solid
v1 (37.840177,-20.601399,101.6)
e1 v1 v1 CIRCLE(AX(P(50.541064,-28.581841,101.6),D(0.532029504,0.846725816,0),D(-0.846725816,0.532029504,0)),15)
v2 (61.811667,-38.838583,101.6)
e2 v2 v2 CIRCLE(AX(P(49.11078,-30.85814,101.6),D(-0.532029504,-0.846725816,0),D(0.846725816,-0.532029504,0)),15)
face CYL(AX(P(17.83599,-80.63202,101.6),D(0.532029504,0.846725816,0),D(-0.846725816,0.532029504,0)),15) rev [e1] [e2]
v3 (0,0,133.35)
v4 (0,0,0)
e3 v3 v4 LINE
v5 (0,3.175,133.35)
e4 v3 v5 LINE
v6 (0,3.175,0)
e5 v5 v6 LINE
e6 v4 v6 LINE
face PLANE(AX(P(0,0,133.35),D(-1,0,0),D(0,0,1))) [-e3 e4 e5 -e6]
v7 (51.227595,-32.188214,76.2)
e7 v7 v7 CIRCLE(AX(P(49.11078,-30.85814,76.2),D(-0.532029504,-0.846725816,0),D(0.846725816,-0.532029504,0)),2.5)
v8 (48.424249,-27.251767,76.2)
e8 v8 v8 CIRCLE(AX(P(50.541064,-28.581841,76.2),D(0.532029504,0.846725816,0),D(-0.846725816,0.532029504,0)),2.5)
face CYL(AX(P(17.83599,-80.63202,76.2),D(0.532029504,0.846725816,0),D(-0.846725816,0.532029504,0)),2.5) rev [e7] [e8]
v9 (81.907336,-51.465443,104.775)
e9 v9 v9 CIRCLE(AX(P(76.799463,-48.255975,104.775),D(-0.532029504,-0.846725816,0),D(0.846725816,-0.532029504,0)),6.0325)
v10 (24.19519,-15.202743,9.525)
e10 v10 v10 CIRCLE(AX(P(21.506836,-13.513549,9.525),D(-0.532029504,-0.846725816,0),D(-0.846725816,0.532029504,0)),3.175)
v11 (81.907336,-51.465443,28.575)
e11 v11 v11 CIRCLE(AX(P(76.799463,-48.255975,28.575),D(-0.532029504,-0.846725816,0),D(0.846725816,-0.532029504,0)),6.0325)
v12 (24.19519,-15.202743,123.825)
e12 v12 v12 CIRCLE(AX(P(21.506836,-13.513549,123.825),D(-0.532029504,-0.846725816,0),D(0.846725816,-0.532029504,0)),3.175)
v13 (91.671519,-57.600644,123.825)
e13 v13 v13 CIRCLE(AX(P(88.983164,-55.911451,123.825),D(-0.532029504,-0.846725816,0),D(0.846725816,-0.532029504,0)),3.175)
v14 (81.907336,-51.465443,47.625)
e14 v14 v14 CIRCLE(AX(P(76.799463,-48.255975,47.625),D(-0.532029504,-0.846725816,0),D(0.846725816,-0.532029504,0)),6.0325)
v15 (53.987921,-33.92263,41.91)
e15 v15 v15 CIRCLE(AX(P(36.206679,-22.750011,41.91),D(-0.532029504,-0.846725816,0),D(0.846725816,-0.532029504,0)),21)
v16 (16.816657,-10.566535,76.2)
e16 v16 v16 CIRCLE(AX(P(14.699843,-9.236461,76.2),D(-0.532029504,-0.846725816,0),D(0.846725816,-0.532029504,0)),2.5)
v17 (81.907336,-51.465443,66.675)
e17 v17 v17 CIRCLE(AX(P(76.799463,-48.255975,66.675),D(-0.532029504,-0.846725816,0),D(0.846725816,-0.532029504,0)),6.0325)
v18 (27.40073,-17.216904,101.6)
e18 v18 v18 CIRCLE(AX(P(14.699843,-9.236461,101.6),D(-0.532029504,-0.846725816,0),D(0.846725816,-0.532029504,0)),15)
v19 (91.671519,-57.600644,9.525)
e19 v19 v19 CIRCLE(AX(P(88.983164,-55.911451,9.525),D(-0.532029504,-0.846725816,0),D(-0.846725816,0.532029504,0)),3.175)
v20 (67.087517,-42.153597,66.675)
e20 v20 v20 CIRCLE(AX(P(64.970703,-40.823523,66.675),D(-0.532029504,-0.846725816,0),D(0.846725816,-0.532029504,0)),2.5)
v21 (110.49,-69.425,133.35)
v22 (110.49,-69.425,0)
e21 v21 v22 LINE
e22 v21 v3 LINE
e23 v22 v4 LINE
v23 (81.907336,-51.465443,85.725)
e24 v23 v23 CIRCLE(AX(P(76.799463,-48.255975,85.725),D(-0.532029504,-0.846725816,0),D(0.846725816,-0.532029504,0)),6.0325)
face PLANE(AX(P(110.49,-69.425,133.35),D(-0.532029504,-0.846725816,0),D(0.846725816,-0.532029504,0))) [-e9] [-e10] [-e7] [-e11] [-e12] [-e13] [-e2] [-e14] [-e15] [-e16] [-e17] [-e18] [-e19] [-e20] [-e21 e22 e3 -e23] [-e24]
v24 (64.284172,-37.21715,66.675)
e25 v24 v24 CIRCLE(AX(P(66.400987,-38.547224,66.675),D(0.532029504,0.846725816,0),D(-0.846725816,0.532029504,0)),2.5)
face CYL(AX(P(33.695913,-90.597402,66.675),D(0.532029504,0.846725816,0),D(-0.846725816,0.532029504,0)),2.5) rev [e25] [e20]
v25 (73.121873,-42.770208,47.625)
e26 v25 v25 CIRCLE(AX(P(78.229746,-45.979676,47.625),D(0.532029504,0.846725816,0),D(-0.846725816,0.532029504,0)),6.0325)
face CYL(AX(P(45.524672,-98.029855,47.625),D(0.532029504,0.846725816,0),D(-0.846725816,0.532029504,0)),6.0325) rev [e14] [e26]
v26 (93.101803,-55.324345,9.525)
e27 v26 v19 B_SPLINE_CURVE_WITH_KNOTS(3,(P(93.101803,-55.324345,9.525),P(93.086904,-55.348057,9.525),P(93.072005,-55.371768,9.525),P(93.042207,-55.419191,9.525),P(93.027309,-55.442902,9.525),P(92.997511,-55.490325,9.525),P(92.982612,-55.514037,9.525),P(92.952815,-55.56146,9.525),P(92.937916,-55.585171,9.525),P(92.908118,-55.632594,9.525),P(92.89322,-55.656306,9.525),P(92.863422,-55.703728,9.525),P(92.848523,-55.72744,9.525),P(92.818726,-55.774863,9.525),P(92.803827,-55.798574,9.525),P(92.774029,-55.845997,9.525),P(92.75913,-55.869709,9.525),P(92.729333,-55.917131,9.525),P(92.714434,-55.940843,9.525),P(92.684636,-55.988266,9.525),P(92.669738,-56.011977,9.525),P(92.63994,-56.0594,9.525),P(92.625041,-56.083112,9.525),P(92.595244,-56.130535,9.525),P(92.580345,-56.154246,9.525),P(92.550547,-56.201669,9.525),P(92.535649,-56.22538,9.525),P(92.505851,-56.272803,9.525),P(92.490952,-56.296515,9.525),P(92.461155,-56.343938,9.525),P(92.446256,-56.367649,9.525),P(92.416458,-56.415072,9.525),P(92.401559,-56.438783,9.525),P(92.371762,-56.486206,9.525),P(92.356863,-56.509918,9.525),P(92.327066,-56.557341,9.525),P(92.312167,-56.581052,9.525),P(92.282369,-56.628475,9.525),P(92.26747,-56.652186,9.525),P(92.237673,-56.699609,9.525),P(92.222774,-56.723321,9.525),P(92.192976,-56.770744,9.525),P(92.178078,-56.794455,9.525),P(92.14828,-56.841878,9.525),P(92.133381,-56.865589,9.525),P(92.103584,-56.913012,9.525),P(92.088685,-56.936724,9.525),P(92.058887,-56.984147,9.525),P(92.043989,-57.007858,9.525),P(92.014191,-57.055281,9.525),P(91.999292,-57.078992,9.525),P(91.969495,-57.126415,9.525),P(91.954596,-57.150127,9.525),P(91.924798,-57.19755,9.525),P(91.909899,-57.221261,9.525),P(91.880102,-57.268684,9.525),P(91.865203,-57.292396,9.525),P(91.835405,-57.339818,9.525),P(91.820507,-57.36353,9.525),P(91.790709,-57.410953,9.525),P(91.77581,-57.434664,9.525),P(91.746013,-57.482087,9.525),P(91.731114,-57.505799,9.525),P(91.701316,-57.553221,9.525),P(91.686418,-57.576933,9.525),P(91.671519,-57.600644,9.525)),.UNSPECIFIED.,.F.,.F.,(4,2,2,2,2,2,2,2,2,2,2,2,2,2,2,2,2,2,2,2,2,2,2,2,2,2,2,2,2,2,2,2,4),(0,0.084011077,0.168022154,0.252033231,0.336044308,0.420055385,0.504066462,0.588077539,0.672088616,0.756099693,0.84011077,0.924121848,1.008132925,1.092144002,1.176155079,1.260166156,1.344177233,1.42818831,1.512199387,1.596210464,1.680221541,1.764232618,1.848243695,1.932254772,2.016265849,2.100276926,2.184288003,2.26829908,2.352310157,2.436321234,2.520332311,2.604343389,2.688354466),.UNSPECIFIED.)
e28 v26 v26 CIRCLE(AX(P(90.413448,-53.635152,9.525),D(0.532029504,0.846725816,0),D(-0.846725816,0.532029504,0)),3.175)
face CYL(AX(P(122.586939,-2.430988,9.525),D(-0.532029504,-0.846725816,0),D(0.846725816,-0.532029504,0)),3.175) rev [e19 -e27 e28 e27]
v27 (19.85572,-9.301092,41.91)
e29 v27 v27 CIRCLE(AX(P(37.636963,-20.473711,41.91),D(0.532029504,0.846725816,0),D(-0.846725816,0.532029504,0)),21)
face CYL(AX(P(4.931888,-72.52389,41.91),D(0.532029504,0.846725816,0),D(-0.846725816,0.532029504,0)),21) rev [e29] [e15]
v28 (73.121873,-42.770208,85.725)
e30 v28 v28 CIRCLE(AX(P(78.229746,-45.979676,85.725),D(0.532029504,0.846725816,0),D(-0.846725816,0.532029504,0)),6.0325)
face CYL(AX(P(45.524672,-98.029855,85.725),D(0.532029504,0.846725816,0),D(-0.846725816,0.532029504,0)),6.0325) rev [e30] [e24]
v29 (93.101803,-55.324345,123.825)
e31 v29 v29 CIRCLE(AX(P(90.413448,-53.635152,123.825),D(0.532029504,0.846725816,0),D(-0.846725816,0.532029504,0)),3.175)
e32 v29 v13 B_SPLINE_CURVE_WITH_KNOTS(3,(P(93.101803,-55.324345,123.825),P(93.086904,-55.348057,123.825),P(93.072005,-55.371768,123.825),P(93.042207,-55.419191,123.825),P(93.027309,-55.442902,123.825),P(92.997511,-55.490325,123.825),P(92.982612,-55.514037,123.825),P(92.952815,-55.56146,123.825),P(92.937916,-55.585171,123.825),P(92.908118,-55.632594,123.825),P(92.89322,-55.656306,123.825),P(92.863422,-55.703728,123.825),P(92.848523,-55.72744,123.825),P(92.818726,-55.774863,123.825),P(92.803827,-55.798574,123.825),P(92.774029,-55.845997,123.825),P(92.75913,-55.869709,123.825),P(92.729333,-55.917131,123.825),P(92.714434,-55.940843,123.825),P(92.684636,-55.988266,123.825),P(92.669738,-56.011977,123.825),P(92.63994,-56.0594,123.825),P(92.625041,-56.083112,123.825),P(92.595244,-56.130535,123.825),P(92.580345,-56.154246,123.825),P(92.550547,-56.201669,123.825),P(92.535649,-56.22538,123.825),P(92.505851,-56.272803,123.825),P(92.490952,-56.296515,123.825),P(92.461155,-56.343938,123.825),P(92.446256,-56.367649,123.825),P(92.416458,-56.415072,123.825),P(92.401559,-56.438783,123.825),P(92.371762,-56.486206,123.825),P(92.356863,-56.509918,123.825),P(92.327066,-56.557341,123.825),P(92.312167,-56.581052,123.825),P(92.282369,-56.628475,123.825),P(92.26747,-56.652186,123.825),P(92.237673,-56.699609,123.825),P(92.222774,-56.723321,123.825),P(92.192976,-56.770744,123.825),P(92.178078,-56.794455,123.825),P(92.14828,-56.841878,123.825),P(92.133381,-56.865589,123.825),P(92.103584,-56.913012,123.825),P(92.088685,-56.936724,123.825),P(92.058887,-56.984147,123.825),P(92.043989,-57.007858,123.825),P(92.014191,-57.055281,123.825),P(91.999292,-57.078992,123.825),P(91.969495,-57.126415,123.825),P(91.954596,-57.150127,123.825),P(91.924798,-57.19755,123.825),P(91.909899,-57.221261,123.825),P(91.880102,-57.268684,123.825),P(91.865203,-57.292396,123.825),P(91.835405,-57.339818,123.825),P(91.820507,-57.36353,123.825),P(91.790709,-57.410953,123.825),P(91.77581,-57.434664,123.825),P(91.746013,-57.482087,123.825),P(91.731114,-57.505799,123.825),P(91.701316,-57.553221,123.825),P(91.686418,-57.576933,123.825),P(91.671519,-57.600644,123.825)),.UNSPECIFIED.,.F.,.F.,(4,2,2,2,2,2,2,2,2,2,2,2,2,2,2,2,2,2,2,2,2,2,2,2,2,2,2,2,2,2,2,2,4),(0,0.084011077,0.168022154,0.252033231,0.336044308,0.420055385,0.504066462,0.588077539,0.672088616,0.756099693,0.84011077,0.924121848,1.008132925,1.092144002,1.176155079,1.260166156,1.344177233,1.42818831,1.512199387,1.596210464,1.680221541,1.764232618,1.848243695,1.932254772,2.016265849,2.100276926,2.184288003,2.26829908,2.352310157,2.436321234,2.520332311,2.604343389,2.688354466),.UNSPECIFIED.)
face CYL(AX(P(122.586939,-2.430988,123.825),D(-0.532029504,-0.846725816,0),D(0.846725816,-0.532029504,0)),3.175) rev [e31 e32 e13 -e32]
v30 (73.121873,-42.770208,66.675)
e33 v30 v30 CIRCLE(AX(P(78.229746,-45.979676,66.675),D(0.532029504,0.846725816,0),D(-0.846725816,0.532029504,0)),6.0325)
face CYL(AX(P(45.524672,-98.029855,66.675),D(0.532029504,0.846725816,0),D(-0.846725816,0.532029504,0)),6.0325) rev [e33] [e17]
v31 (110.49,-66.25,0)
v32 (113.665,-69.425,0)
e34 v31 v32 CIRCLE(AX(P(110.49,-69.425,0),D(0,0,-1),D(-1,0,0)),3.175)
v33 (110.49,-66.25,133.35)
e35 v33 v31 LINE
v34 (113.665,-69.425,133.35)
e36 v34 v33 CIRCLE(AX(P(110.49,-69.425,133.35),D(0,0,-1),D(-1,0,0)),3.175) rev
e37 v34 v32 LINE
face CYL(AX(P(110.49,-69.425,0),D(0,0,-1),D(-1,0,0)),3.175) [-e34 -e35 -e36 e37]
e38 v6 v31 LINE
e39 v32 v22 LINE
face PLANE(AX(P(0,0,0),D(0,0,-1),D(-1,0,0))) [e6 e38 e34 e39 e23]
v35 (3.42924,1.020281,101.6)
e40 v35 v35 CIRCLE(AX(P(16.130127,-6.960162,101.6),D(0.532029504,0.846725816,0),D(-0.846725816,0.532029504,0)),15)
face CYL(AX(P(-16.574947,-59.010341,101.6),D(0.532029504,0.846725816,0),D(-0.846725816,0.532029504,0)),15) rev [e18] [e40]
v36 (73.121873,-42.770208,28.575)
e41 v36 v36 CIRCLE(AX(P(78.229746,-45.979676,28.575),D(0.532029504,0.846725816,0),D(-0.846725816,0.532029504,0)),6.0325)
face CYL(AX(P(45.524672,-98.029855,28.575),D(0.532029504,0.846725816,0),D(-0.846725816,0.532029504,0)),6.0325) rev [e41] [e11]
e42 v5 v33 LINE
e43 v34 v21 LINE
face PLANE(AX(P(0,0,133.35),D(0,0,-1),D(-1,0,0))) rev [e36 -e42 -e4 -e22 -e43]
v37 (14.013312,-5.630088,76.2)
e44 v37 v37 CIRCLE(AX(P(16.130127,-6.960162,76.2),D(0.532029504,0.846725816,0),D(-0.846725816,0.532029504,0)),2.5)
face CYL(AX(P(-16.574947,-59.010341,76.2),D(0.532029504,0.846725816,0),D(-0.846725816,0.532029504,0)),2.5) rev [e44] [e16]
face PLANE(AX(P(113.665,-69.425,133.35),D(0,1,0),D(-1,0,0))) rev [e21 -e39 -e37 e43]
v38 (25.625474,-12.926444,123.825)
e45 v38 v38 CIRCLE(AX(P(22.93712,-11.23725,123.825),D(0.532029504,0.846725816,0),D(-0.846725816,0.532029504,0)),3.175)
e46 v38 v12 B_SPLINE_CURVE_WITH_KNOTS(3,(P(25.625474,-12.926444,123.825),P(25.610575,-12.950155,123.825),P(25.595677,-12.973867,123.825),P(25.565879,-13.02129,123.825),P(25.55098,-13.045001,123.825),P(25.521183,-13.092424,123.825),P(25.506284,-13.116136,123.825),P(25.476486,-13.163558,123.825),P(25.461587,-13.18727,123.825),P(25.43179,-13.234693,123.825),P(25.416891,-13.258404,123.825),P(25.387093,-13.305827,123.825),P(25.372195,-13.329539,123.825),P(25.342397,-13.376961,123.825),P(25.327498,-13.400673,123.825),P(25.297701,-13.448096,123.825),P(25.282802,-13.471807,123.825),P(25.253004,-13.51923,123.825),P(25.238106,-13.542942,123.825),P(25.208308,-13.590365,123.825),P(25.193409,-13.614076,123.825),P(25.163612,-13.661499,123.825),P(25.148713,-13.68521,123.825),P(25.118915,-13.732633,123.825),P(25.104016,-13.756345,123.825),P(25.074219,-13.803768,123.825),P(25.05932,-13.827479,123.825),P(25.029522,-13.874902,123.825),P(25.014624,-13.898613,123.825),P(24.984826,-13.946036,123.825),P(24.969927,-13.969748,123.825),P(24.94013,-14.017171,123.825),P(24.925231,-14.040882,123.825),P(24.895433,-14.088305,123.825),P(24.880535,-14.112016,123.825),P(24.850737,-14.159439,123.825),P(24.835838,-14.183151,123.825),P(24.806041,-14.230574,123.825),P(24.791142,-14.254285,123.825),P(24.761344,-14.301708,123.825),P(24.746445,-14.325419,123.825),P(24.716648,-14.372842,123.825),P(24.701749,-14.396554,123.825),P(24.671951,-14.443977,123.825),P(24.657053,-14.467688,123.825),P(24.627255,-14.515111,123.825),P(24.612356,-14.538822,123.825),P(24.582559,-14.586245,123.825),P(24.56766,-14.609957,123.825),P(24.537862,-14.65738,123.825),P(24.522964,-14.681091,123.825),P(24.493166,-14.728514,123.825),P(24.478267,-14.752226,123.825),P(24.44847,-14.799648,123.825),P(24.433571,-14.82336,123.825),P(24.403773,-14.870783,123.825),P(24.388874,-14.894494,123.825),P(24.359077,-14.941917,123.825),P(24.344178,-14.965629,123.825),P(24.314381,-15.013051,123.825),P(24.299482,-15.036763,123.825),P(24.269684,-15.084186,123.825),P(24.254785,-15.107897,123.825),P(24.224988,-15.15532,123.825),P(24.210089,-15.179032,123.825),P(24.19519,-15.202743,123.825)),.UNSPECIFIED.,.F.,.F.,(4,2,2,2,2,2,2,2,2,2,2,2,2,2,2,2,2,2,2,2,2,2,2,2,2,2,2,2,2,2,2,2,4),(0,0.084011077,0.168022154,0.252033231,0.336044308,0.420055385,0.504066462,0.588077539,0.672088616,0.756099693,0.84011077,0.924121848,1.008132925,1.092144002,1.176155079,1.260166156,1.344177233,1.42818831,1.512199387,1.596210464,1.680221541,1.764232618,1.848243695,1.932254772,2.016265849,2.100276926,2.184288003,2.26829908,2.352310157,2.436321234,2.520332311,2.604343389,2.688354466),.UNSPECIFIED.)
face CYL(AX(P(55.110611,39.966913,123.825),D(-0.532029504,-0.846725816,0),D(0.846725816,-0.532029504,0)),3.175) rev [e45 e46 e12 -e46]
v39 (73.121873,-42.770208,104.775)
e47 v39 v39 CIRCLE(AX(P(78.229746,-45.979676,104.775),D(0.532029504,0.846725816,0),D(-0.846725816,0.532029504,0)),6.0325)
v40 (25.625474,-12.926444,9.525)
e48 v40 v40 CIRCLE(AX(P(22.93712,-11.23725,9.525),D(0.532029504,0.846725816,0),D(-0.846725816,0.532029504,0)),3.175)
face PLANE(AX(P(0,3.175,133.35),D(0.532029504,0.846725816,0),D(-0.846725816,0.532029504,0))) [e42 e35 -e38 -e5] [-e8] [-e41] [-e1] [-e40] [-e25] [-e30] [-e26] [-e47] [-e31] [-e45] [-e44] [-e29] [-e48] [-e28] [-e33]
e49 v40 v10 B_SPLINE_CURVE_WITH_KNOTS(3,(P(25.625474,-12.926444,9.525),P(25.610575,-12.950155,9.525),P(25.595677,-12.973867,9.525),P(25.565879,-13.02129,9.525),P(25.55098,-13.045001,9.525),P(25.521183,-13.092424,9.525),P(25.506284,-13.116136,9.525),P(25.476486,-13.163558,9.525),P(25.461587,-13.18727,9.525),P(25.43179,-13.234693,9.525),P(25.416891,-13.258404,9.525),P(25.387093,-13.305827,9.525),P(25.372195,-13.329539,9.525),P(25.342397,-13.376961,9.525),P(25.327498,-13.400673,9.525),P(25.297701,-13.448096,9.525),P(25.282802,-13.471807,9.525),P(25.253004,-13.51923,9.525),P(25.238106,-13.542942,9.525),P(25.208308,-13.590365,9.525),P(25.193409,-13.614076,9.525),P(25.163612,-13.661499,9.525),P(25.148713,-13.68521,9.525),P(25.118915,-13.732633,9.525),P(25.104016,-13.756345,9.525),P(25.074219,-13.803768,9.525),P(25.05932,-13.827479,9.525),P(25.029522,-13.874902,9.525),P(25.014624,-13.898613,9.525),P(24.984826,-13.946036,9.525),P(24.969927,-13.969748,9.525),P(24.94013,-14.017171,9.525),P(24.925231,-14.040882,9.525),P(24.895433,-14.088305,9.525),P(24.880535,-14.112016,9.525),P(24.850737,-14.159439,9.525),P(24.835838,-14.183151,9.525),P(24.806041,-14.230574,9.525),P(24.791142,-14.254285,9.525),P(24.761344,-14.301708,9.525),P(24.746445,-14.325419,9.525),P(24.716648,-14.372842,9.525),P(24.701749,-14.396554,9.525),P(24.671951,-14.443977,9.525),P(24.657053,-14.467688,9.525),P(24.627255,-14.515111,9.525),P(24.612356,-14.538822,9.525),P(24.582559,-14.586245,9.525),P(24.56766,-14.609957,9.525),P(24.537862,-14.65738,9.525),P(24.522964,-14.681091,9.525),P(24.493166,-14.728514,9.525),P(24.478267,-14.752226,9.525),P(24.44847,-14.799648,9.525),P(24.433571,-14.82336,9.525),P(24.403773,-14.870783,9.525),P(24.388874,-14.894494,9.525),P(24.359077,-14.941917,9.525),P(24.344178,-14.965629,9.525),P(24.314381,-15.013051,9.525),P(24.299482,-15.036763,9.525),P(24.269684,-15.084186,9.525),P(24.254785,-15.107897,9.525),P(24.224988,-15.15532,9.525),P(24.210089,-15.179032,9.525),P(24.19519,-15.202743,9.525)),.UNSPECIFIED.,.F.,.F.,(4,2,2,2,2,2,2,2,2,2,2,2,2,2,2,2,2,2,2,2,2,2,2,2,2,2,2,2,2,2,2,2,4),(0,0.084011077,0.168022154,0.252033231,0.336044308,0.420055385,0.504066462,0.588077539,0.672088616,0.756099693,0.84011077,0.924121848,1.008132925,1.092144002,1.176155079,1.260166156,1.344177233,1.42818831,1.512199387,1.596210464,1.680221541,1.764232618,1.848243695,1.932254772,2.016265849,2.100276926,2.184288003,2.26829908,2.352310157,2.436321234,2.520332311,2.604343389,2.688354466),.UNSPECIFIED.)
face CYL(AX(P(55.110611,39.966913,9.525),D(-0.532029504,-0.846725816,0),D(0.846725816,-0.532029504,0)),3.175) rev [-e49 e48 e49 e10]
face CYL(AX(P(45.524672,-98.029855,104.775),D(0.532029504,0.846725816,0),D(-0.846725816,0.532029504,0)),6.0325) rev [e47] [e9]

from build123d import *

# Parameters (mm, degrees)
BOSS_EXTRUDE1_DEPTH = 133.35
SKETCH2_R           = 21
CUT_EXTRUDE1_DEPTH  = 187.593999065
SKETCH3_W           = 133.35
SKETCH3_H           = 3.175
BOSS_EXTRUDE2_DEPTH = 3.175
FILLET1_R           = 3.175
SKETCH5_R           = 15
CUT_EXTRUDE2_DEPTH  = 189.467318942
SKETCH6_R           = 6.0325
CUT_EXTRUDE3_DEPTH  = 189.467318942
SKETCH7_R           = 3.175
CUT_EXTRUDE4_DEPTH  = 189.472240296
SKETCH15_R          = 2.5
CUT_EXTRUDE8_DEPTH  = 189.467318942
SKETCH18_R          = 30.1625
SKETCH18_R_2        = 21
BOSS_EXTRUDE3_DEPTH = 2.688354466


with BuildPart() as part:
    # Sketch1 → Boss-Extrude1 (new body)
    with BuildSketch(Plane.XY):
        Polygon((110.49, -69.425000088), (0, 0), (0, 3.175), (110.49, -66.250000088), align=None)
    extrude(amount=BOSS_EXTRUDE1_DEPTH)

    # Sketch2 → Cut-Extrude1 (cut, through all)
    with BuildSketch(Plane(origin=(1.430283892, 2.276299128, 0), x_dir=(0.8467258159330607, -0.5320295035357462, 0), z_dir=(0.5320295035357462, 0.8467258159330607, 0))):
        with Locations(Location((42.760806326, -41.91, 0), (0, 0, 180))):
            Circle(SKETCH2_R)
    extrude(amount=-CUT_EXTRUDE1_DEPTH, mode=Mode.SUBTRACT)

    # Sketch3 → Boss-Extrude2 (add)
    with BuildSketch(Plane(origin=(110.49, 0, 0), x_dir=(0, 0, -1), z_dir=(1, 0, 0))):
        with Locations((-66.675, -67.837500088)):
            Rectangle(SKETCH3_W, SKETCH3_H)
    extrude(amount=BOSS_EXTRUDE2_DEPTH)

    # Fillet1
    fillet1_edges = [part.edges().sort_by_distance(p)[0] for p in [
        (113.665, -66.250000088, 66.675),
    ]]
    fillet(fillet1_edges, radius=FILLET1_R - 0.0001)  # a hair under: the kernel refuses the full size

    # Sketch5 → Cut-Extrude2 (cut, through all)
    with BuildSketch(Plane(origin=(1.430283892, 2.276299128, 0), x_dir=(0.8467258159330606, -0.5320295035357464, 0), z_dir=(0.5320295035357464, 0.8467258159330606, 0))):
        with Locations(Location((17.360806326, -101.6, 0), (0, 0, 180))):
            Circle(SKETCH5_R)
        with Locations(Location((58.000806326, -101.6, 0), (0, 0, 180))):
            Circle(SKETCH5_R)
    extrude(amount=-CUT_EXTRUDE2_DEPTH, mode=Mode.SUBTRACT)

    # Sketch6 → Cut-Extrude3 (cut, through all)
    with BuildSketch(Plane(origin=(1.430283892, 2.276299128, 0), x_dir=(0.8467258159330606, -0.5320295035357464, 0), z_dir=(0.5320295035357464, 0.8467258159330606, 0))):
        with Locations(Location((90.701690059, -66.675, 0), (0, 0, 180))):
            Circle(SKETCH6_R)
        with Locations(Location((90.701690059, -47.625, 0), (0, 0, 180))):
            Circle(SKETCH6_R)
        with Locations(Location((90.701690059, -28.575, 0), (0, 0, 180))):
            Circle(SKETCH6_R)
        with Locations(Location((90.701690059, -85.725, 0), (0, 0, 180))):
            Circle(SKETCH6_R)
        with Locations(Location((90.701690059, -104.775, 0), (0, 0, 180))):
            Circle(SKETCH6_R)
    extrude(amount=-CUT_EXTRUDE3_DEPTH, mode=Mode.SUBTRACT)

    # Sketch7 → Cut-Extrude4 (cut, through all)
    with BuildSketch(Plane(origin=(0, 0, 0), x_dir=(0.8467258159330607, -0.5320295035357464, 0), z_dir=(-0.5320295035357463, -0.8467258159330606, 0))):
        with Locations((105.090883732, 123.825)):
            Circle(SKETCH7_R)
        with Locations((25.4, 123.825)):
            Circle(SKETCH7_R)
        with Locations((25.4, 9.525)):
            Circle(SKETCH7_R)
        with Locations((105.090883732, 9.525)):
            Circle(SKETCH7_R)
    extrude(amount=-CUT_EXTRUDE4_DEPTH, mode=Mode.SUBTRACT)

    # Sketch15 → Cut-Extrude8 (cut, through all)
    with BuildSketch(Plane(origin=(1.430283892, 2.276299128, 0), x_dir=(0.8467258159330606, -0.5320295035357464, 0), z_dir=(0.5320295035357464, 0.8467258159330606, 0))):
        with Locations(Location((17.360806326, -76.2, 0), (0, 0, 180))):
            Circle(SKETCH15_R)
        with Locations(Location((76.731690059, -66.675, 0), (0, 0, 180))):
            Circle(SKETCH15_R)
        with Locations(Location((58.000806326, -76.2, 0), (0, 0, 180))):
            Circle(SKETCH15_R)
    extrude(amount=-CUT_EXTRUDE8_DEPTH, mode=Mode.SUBTRACT)

    # Sketch18 → Boss-Extrude3 (add)
    with BuildSketch(Plane(origin=(1.430283892, 2.276299128, 0), x_dir=(0.8467258159330606, -0.5320295035357464, 0), z_dir=(0.5320295035357464, 0.8467258159330606, 0))):
        with Locations((42.760806326, -41.91)):
            Circle(SKETCH18_R)
        with Locations(Location((42.760806326, -41.91, 0), (0, 0, 180))):
            Circle(SKETCH18_R_2, mode=Mode.SUBTRACT)
    extrude(amount=-BOSS_EXTRUDE3_DEPTH)


solid = part.part
